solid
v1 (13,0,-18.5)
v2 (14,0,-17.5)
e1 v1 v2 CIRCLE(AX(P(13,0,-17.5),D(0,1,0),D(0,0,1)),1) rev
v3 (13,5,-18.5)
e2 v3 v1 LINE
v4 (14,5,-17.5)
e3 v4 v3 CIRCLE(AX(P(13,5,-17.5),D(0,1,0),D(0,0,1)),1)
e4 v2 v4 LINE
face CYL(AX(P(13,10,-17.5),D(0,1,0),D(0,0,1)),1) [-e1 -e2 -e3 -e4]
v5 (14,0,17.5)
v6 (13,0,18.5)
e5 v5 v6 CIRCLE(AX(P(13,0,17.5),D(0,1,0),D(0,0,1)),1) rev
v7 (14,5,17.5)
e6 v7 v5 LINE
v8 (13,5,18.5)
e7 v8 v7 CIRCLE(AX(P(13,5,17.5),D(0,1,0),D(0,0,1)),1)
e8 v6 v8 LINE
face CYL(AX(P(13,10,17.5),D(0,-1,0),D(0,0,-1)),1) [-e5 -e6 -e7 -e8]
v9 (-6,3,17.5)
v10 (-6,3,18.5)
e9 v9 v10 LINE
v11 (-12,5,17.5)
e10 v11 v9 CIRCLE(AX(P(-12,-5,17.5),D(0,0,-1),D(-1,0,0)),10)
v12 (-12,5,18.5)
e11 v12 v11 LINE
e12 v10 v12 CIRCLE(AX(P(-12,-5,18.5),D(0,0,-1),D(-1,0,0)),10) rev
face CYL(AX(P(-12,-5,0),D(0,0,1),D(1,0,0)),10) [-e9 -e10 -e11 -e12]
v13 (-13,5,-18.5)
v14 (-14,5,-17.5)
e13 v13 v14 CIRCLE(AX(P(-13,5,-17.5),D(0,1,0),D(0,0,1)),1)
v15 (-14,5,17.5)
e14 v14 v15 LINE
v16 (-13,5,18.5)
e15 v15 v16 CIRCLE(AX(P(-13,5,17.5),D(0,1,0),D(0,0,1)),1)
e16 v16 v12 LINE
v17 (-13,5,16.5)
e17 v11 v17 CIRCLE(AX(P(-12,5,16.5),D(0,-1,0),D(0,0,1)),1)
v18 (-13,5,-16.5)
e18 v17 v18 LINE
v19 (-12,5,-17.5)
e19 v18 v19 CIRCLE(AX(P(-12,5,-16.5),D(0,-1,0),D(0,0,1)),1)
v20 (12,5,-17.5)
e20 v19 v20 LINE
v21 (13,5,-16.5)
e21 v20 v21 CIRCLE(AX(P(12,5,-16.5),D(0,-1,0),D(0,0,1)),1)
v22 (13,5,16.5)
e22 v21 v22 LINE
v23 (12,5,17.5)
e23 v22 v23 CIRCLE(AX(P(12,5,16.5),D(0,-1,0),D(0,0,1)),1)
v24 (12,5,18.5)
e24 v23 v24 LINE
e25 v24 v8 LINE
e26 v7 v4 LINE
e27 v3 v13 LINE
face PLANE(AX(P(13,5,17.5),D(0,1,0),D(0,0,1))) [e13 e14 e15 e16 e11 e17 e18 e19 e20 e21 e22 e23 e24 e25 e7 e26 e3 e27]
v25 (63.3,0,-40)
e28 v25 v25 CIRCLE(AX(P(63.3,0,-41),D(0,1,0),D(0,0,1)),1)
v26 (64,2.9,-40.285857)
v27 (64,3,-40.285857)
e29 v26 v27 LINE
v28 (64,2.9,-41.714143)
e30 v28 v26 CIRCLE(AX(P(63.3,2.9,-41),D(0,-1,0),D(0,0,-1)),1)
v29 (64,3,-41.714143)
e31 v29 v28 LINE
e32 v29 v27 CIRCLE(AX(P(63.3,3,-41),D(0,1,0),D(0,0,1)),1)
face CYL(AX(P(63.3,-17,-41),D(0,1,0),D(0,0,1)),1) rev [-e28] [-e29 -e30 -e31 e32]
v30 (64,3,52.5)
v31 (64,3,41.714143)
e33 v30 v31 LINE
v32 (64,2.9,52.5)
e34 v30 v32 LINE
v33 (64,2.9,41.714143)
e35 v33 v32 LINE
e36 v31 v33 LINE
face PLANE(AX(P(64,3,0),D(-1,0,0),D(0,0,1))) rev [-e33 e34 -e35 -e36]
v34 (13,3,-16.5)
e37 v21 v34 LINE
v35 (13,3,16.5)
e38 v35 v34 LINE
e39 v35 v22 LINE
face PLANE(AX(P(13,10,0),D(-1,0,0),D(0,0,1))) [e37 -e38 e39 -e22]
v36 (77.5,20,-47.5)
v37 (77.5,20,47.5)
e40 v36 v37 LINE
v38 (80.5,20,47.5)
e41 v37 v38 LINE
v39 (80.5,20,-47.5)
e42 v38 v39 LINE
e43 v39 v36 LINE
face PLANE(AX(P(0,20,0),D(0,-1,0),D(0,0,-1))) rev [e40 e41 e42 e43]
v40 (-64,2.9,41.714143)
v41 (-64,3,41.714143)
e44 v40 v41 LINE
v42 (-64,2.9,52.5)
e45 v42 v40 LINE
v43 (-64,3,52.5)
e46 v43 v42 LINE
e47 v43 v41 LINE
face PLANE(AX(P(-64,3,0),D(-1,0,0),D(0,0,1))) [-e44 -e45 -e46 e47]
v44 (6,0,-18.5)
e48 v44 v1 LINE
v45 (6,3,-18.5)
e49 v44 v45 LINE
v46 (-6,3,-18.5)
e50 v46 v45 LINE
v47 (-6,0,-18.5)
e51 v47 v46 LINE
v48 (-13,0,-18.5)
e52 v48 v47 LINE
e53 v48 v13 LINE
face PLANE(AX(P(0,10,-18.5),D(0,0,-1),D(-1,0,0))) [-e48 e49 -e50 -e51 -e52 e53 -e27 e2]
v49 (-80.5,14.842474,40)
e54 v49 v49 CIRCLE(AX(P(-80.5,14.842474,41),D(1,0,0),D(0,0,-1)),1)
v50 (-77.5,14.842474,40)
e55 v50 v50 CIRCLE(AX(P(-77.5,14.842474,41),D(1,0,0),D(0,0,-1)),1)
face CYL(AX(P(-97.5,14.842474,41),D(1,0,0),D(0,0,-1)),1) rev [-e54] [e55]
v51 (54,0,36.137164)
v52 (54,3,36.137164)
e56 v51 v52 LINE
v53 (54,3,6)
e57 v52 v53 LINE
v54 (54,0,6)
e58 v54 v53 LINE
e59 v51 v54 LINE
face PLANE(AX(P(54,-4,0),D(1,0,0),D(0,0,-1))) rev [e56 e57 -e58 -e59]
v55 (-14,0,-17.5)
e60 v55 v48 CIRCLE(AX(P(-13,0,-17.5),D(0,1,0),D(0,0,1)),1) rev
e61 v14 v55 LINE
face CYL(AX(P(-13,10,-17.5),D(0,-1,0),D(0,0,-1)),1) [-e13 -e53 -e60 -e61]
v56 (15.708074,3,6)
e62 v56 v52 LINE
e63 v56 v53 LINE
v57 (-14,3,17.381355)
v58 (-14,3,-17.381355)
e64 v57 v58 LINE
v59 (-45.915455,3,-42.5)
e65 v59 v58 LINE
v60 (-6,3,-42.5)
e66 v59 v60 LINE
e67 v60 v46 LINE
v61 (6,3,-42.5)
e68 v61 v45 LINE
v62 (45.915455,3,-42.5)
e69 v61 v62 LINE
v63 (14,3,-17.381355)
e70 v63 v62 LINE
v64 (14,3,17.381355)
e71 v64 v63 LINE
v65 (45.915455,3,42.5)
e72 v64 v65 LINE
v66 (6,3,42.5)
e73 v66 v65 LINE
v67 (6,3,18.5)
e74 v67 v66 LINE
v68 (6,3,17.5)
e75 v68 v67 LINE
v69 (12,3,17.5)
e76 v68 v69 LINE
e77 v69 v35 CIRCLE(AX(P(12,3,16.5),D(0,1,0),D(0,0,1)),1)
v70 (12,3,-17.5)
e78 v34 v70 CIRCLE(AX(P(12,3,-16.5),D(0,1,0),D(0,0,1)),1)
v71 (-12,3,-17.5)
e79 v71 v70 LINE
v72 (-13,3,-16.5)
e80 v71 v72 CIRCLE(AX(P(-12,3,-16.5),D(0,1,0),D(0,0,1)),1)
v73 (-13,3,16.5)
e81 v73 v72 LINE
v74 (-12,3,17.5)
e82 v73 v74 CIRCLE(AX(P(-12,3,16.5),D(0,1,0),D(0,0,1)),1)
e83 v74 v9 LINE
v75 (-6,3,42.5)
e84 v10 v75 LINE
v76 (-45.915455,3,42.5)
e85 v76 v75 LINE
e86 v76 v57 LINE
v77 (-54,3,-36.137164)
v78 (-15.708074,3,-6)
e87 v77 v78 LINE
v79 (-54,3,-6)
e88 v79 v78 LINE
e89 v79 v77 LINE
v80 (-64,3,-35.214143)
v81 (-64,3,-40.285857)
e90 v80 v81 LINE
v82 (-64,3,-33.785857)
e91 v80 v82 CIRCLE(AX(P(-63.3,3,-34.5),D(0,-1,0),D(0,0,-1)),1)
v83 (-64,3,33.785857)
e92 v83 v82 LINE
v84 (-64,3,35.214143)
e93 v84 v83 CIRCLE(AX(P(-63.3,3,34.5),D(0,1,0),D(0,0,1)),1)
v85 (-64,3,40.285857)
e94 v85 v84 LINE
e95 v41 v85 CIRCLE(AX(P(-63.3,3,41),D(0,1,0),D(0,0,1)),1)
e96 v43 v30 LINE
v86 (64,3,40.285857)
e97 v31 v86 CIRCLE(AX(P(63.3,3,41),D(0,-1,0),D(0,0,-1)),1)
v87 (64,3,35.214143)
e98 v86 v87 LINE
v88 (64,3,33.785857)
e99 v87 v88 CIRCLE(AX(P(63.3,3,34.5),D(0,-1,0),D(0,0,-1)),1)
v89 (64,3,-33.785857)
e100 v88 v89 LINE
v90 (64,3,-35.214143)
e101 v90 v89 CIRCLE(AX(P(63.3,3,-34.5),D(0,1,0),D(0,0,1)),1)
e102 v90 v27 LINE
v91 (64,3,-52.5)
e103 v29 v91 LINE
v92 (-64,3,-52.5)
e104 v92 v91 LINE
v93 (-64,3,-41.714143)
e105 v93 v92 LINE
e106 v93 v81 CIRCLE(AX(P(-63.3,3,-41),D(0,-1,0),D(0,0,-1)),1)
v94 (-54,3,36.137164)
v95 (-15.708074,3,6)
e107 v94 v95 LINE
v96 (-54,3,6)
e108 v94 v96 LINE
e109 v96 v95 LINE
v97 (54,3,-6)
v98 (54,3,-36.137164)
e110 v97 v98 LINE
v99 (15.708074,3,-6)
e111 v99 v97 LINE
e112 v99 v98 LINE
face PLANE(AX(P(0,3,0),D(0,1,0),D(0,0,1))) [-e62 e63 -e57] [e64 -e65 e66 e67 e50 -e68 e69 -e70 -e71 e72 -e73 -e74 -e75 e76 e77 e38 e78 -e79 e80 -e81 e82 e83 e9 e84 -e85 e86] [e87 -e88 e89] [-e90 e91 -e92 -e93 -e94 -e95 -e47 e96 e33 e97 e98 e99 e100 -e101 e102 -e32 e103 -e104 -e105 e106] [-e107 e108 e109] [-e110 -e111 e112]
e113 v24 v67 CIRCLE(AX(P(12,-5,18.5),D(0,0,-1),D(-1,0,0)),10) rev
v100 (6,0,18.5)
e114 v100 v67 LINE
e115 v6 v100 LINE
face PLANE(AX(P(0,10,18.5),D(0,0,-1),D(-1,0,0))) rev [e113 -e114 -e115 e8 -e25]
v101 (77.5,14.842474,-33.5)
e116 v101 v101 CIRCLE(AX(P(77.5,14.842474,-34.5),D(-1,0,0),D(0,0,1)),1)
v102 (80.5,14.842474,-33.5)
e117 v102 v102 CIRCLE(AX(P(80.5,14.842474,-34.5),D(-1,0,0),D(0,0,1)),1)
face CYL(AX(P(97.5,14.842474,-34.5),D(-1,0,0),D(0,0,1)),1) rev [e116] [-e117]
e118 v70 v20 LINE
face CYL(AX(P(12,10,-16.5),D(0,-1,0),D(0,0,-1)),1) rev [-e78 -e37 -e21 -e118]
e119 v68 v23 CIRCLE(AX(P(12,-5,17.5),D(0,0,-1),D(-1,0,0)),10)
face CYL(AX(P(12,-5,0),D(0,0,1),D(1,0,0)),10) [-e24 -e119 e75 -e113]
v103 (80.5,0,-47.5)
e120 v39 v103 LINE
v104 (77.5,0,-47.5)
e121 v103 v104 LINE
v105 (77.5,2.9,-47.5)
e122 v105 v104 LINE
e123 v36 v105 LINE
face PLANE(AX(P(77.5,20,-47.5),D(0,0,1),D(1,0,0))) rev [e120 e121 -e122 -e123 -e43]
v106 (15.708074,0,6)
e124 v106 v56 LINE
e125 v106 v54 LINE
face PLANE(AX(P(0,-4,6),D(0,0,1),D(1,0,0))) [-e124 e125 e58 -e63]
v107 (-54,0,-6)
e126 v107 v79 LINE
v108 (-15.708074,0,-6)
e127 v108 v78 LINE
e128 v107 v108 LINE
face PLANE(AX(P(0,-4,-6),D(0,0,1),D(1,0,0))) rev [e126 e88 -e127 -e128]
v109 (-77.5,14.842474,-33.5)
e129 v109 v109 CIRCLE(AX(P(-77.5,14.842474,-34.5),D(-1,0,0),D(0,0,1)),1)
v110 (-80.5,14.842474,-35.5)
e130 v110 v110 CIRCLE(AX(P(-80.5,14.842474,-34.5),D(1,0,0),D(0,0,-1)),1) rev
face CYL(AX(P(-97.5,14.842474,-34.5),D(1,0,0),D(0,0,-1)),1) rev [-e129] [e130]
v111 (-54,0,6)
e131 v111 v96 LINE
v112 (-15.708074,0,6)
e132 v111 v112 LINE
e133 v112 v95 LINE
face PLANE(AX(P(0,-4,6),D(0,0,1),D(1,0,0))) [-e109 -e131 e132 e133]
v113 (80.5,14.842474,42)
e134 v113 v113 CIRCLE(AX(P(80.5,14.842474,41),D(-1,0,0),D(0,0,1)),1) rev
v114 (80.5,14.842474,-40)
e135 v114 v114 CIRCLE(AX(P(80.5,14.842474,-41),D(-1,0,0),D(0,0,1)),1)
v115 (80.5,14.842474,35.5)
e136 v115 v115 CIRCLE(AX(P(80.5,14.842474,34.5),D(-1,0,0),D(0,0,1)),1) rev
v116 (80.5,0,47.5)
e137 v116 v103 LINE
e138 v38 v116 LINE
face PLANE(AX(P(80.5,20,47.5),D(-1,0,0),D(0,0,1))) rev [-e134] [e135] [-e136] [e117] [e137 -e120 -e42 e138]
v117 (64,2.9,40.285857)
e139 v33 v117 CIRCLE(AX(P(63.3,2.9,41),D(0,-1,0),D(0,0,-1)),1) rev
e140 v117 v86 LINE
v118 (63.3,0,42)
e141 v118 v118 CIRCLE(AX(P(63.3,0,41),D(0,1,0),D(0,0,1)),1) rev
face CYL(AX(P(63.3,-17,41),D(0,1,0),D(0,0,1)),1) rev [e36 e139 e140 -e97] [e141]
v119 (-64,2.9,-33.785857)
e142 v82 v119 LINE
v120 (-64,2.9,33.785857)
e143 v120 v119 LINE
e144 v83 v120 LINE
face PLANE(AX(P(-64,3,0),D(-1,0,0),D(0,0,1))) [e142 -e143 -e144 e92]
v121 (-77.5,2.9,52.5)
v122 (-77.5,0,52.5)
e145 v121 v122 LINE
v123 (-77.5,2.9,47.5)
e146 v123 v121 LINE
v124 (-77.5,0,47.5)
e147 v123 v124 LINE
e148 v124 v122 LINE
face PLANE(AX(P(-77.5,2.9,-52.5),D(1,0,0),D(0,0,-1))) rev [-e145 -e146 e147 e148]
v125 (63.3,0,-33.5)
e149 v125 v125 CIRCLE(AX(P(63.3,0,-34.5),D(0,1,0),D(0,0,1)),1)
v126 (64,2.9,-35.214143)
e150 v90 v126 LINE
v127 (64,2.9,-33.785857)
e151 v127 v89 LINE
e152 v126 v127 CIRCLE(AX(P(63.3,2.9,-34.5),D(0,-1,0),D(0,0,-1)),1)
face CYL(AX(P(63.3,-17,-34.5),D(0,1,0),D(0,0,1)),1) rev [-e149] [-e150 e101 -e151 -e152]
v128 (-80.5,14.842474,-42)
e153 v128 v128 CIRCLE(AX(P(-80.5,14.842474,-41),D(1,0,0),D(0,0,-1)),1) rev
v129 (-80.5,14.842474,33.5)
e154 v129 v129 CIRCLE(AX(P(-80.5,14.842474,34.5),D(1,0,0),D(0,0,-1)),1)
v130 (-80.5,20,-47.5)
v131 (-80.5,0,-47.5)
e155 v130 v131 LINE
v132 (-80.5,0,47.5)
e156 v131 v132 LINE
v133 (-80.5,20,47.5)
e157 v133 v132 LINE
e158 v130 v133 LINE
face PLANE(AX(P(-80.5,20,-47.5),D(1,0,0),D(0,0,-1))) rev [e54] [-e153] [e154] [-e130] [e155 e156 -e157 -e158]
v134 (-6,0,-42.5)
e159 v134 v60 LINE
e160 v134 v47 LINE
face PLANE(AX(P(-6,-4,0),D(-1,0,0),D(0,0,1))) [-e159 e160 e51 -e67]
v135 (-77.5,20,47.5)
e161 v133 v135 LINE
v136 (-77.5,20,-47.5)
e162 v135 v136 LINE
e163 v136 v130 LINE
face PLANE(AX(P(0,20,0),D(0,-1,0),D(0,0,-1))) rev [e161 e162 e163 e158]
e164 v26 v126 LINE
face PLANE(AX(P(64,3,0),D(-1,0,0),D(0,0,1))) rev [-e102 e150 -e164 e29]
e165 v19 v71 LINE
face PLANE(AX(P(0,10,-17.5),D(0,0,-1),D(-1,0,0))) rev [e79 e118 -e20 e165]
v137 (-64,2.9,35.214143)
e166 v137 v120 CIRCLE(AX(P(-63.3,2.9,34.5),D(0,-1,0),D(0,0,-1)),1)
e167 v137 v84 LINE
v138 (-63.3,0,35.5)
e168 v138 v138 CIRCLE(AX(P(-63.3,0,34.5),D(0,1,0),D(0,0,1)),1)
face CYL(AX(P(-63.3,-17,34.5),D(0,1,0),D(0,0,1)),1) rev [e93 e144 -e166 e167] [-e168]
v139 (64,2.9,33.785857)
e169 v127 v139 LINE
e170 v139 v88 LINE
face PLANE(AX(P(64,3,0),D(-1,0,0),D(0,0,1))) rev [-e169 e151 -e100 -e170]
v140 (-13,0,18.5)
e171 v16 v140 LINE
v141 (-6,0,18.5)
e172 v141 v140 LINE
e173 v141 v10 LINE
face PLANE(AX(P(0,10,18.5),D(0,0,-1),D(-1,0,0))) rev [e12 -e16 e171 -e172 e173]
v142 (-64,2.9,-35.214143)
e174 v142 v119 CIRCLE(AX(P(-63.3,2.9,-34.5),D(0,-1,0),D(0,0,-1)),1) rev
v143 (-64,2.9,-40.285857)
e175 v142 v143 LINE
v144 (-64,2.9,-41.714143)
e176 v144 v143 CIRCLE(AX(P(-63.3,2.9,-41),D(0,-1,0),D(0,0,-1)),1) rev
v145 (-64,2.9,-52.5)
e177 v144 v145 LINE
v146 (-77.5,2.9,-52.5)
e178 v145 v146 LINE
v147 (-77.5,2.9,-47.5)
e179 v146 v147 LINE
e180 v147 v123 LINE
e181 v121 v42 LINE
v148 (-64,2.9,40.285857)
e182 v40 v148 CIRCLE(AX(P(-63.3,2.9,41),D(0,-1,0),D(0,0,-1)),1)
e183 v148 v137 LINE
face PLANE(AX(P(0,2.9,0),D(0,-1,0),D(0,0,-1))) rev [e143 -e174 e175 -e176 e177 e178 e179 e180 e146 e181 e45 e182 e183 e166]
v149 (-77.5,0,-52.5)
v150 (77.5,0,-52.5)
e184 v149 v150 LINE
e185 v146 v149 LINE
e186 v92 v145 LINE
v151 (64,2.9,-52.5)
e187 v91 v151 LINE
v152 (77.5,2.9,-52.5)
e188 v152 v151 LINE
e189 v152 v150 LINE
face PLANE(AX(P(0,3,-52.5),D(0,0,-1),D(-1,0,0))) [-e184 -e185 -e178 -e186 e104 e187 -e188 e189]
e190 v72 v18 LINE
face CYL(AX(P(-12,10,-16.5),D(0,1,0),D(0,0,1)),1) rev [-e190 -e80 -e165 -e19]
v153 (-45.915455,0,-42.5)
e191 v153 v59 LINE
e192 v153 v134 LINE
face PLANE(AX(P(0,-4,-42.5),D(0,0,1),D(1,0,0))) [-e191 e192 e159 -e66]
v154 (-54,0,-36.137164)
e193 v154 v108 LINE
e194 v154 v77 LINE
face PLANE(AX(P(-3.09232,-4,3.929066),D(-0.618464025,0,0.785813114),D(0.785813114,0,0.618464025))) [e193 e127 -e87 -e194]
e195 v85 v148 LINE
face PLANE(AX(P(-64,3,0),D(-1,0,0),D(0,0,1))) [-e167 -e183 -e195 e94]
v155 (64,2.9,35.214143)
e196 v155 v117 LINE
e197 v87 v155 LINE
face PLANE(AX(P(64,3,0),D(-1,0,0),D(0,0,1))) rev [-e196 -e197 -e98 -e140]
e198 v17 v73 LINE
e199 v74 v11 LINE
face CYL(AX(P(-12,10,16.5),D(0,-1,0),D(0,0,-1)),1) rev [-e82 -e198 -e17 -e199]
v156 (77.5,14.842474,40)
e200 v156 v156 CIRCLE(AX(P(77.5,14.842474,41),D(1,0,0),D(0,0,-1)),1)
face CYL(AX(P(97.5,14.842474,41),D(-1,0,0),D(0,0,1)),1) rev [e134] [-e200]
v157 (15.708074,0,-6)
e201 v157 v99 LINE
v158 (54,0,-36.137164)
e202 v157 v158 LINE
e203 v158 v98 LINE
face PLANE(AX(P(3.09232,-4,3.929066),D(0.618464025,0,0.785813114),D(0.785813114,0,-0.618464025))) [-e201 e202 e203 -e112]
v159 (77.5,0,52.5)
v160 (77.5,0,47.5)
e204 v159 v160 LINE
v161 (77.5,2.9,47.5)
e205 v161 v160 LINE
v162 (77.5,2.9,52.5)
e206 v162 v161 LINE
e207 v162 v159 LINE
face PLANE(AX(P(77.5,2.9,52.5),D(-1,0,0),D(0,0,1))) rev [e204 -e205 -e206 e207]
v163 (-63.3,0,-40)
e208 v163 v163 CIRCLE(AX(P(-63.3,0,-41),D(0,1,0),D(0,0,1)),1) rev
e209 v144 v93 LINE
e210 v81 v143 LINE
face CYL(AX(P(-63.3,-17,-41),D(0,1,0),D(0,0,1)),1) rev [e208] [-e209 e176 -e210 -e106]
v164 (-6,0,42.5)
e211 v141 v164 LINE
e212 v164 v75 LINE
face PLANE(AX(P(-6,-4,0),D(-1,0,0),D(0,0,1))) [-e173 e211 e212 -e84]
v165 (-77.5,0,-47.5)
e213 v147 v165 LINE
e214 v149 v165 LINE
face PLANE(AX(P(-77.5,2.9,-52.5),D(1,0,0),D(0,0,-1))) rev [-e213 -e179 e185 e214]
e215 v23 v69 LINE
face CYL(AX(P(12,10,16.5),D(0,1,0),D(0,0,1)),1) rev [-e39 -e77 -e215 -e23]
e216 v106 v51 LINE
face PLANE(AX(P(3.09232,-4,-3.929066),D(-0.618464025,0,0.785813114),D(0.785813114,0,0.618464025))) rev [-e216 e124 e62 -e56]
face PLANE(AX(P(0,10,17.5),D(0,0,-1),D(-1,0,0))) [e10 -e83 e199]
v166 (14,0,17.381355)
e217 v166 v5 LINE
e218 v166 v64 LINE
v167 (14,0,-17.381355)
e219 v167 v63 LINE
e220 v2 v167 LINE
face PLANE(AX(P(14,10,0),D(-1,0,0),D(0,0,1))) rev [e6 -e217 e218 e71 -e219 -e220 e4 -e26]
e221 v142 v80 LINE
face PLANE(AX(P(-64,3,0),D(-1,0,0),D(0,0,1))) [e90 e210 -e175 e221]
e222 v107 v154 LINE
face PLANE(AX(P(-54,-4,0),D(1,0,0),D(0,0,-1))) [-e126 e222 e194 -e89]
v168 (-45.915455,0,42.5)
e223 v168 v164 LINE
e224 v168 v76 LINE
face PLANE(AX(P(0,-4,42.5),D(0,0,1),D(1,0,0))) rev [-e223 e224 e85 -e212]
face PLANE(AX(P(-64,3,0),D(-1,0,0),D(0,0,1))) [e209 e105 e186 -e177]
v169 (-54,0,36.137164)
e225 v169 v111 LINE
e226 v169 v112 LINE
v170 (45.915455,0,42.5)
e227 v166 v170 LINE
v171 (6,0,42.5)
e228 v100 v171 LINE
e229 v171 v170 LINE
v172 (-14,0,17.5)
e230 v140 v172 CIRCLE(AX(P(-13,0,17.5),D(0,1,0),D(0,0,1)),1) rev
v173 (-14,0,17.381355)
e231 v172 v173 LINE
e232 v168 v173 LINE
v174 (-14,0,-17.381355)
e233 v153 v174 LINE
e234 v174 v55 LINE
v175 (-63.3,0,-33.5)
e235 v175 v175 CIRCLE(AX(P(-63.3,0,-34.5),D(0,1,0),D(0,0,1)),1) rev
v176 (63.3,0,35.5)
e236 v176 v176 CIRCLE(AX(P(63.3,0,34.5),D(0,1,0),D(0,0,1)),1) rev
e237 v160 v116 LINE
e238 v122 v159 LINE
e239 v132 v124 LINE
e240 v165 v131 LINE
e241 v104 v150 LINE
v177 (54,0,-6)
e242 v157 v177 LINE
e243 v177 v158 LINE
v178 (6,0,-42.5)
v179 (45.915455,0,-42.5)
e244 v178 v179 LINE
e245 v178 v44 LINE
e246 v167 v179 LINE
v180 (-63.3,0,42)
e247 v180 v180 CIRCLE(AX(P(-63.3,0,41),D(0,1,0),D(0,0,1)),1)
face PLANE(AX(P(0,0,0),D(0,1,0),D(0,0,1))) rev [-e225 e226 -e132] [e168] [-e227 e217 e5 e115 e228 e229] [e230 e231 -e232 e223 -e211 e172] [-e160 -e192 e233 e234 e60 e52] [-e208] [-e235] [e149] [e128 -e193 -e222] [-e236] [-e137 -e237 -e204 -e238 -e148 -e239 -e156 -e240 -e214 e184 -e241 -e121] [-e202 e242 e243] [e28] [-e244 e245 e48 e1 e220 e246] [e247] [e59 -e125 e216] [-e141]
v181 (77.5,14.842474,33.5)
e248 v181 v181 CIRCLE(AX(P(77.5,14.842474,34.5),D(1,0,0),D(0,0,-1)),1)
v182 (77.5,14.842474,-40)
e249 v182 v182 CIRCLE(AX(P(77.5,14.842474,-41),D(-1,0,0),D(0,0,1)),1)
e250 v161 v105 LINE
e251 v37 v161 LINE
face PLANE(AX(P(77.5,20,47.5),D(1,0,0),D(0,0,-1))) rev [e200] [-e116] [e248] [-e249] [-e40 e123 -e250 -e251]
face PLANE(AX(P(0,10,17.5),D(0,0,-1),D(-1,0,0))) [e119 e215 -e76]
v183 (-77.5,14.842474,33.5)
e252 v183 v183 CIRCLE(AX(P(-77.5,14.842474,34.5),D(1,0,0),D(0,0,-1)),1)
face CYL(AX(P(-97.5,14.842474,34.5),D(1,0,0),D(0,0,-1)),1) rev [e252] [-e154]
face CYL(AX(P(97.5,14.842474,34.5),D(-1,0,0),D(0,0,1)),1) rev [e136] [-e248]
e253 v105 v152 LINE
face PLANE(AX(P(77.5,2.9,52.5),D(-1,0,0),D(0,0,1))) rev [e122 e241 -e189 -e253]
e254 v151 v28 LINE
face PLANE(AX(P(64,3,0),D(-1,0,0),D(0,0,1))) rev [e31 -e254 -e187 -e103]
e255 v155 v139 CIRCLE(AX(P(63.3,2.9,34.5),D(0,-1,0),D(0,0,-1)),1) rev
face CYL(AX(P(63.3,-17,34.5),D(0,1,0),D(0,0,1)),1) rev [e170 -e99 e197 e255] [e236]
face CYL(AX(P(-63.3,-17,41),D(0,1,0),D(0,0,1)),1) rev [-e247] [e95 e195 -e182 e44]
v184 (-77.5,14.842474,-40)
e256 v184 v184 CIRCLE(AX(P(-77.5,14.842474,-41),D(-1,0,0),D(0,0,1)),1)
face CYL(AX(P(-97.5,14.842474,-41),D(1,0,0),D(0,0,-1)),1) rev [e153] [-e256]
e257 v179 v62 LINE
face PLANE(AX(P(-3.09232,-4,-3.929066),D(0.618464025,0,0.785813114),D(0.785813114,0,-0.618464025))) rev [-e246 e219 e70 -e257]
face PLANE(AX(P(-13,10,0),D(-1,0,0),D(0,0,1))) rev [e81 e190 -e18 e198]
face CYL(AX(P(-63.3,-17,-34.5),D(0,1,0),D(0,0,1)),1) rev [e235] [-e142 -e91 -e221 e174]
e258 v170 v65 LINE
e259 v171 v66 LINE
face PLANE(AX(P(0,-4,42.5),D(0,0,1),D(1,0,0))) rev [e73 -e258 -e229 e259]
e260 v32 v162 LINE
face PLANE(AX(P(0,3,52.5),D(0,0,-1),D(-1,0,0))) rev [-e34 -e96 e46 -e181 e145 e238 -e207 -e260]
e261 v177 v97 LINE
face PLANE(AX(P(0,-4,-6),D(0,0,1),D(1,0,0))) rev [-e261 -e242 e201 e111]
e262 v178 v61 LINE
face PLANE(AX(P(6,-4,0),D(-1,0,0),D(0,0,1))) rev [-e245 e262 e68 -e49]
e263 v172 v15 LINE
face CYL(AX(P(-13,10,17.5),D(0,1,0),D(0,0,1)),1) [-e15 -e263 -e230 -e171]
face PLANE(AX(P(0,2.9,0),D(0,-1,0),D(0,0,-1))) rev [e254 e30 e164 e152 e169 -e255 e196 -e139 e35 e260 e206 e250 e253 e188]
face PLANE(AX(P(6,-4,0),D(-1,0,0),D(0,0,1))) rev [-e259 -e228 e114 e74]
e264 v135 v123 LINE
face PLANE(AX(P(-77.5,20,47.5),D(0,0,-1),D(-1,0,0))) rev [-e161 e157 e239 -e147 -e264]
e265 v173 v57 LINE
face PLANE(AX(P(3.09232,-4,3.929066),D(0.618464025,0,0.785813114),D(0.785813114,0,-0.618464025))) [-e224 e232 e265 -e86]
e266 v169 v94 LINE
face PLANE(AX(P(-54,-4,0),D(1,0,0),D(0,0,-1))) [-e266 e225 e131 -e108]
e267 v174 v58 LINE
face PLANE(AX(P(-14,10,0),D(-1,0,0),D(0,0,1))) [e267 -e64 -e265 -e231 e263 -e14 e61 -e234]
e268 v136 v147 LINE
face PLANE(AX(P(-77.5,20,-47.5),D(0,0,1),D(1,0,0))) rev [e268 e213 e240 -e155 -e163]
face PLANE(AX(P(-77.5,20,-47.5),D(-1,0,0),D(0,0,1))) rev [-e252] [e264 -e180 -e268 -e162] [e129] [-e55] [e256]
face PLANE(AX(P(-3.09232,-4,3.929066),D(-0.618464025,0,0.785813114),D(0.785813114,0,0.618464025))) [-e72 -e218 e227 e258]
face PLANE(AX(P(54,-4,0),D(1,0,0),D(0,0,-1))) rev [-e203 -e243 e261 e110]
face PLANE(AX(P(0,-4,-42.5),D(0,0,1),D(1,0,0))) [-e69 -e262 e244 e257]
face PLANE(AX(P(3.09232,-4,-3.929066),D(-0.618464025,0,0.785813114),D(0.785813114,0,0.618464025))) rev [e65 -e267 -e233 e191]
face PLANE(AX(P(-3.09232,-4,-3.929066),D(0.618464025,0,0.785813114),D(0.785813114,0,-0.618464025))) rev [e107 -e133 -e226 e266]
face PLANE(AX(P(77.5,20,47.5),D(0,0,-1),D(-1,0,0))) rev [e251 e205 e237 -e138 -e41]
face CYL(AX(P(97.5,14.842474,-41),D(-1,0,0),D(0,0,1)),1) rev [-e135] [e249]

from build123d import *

# Parameters (mm, degrees)
SKETCH1_W                                  = 128
SKETCH1_H                                  = 105
BOSS_EXTRUDE1_DEPTH                        = 3
SKETCH2_W                                  = 13.5
SKETCH2_H                                  = 105
BOSS_EXTRUDE2_DEPTH                        = 2.9
BOSS_EXTRUDE9_DEPTH                        = 7
FILLET2_R                                  = 1
CUT_EXTRUDE1_DEPTH                         = 7
SKETCH3_W                                  = 3
SKETCH3_H                                  = 95
BOSS_EXTRUDE10_DEPTH                       = 20
SKETCH11_R                                 = 1
CUT_EXTRUDE2_DEPTH                         = 20
SKETCH13_R                                 = 1
CUT_EXTRUDE3_DEPTH                         = 20
MIRROR1_AT_THE_SECOND_PLANE_COPY_1_SKETC_R = 1
MIRROR1_AT_THE_SECOND_PLANE_COPY_1_DEPTH   = 20
CUT_EXTRUDE8_DEPTH                         = 5
FILLET3_R                                  = 10


with BuildPart() as part:
    # Sketch1 → Boss-Extrude1 (new body)
    with BuildSketch(Plane(origin=(0, 0, 0), x_dir=(1, 0, 0), z_dir=(0, 1, 0))):
        Rectangle(SKETCH1_W, SKETCH1_H)
    extrude(amount=BOSS_EXTRUDE1_DEPTH)

    # Sketch2 → Boss-Extrude2 (add)
    with BuildSketch(Plane(origin=(0, 0, 0), x_dir=(1, 0, 0), z_dir=(0, 1, 0))):
        with Locations((-70.75, 0)):
            Rectangle(SKETCH2_W, SKETCH2_H)
        with Locations((70.75, 0)):
            Rectangle(SKETCH2_W, SKETCH2_H)
    extrude(amount=BOSS_EXTRUDE2_DEPTH)

    # Sketch5 → Boss-Extrude9 (add)
    with BuildSketch(Plane(origin=(0, 3, 0), x_dir=(1, 0, 0), z_dir=(0, 1, 0))):
        Polygon((-6, -18.5), (-6, -17.5), (-13, -17.5), (-13, 17.5), (13, 17.5), (13, -17.5), (6, -17.5), (6, -18.5), (14, -18.5), (14, 18.5), (-14, 18.5), (-14, -18.5), align=None)
    extrude(amount=BOSS_EXTRUDE9_DEPTH)

    # Fillet2
    fillet2_edges = [part.edges().sort_by_distance(p)[0] for p in [
        (13, 6.5, 17.5),
        (14, 6.5, 18.5),
        (14, 6.5, -18.5),
        (-14, 6.5, -18.5),
        (-14, 6.5, 18.5),
        (-13, 6.5, 17.5),
        (-13, 6.5, -17.5),
        (13, 6.5, -17.5),
    ]]
    fillet(fillet2_edges, radius=FILLET2_R)

    # Sketch10 → Cut-Extrude1 (cut)
    with BuildSketch(Plane(origin=(0, 3, 0), x_dir=(1, 0, 0), z_dir=(0, 1, 0))):
        with BuildLine():
            Line((-14, -17.381354556), (-45.915455387, -42.5))
            Line((-45.915455387, -42.5), (-6, -42.5))
            Line((-6, -42.5), (-6, -18.5))
            Line((-6, -18.5), (-13, -18.5))
            ThreePointArc((-13, -18.5), (-13.707106781, -18.207106781), (-14, -17.5))
            Line((-14, -17.5), (-14, -17.381354556))
        make_face()
        Polygon((-54, -6), (-54, -36.137163962), (-15.708074024, -6), align=None)
        with BuildLine():
            Line((6, -18.5), (6, -42.5))
            Line((6, -42.5), (45.915455387, -42.5))
            Line((45.915455387, -42.5), (14, -17.381354556))
            Line((14, -17.381354556), (14, -17.5))
            ThreePointArc((14, -17.5), (13.707106781, -18.207106781), (13, -18.5))
            Line((13, -18.5), (6, -18.5))
        make_face()
        Polygon((-54, 36.137163962), (-54, 6), (-15.708074024, 6), align=None)
        Polygon((15.708074024, -6), (54, -36.137163962), (54, -6), align=None)
        with BuildLine():
            Line((-6, 42.5), (-45.915455387, 42.5))
            Line((-45.915455387, 42.5), (-14, 17.381354556))
            Line((-14, 17.381354556), (-14, 17.5))
            ThreePointArc((-14, 17.5), (-13.707106781, 18.207106781), (-13, 18.5))
            Line((-13, 18.5), (-6, 18.5))
            Line((-6, 18.5), (-6, 42.5))
        make_face()
        Polygon((15.708074024, 6), (54, 6), (54, 36.137163962), align=None)
        with BuildLine():
            Line((45.915455387, 42.5), (6, 42.5))
            Line((6, 42.5), (6, 18.5))
            Line((6, 18.5), (13, 18.5))
            ThreePointArc((13, 18.5), (13.707106781, 18.207106781), (14, 17.5))
            Line((14, 17.5), (14, 17.381354556))
            Line((14, 17.381354556), (45.915455387, 42.5))
        make_face()
    extrude(amount=-CUT_EXTRUDE1_DEPTH, mode=Mode.SUBTRACT)

    # Sketch3 → Boss-Extrude10 (add)
    with BuildSketch(Plane(origin=(0, 0, 0), x_dir=(1, 0, 0), z_dir=(0, 1, 0))):
        with Locations((-79, 0)):
            Rectangle(SKETCH3_W, SKETCH3_H)
        with Locations((79, 0)):
            Rectangle(SKETCH3_W, SKETCH3_H)
    extrude(amount=BOSS_EXTRUDE10_DEPTH)

    # Sketch11 → Cut-Extrude2 (cut)
    with BuildSketch(Plane(origin=(0, 3, 0), x_dir=(1, 0, 0), z_dir=(0, 1, 0))):
        with Locations(Location((-63.3, -41, 0), (0, 0, 270))):
            Circle(SKETCH11_R)
        with Locations(Location((-63.3, -34.5, 0), (0, 0, 270))):
            Circle(SKETCH11_R)
        with Locations(Location((-63.3, 34.5, 0), (0, 0, 270))):
            Circle(SKETCH11_R)
        with Locations(Location((-63.3, 41, 0), (0, 0, 270))):
            Circle(SKETCH11_R)
        with Locations(Location((63.3, 41, 0), (0, 0, 270))):
            Circle(SKETCH11_R)
        with Locations(Location((63.3, 34.5, 0), (0, 0, 270))):
            Circle(SKETCH11_R)
        with Locations(Location((63.3, -34.5, 0), (0, 0, 270))):
            Circle(SKETCH11_R)
        with Locations(Location((63.3, -41, 0), (0, 0, 270))):
            Circle(SKETCH11_R)
    extrude(amount=-CUT_EXTRUDE2_DEPTH, mode=Mode.SUBTRACT)

    # Sketch13 → Cut-Extrude3 (cut)
    with BuildSketch(Plane(origin=(-77.5, 0, 0), x_dir=(0, 0, -1), z_dir=(1, 0, 0))):
        with Locations((-41, 14.842473729)):
            Circle(SKETCH13_R)
        with Locations((-34.5, 14.842473729)):
            Circle(SKETCH13_R)
    cut_extrude3 = extrude(amount=-CUT_EXTRUDE3_DEPTH, mode=Mode.SUBTRACT)

    # Mirror1: Cut-Extrude3 across plane
    add(cut_extrude3.mirror(Plane.XY), mode=Mode.SUBTRACT)

    # Mirror1 at the second plane: Cut-Extrude3 across plane
    add(cut_extrude3.mirror(Plane(origin=(0, 0, 0), x_dir=(0, 0, 1), z_dir=(1, 0, 0))), mode=Mode.SUBTRACT)

    # Mirror1 at the second plane copy 1 sketc → Mirror1 at the second plane copy 1 (cut)
    with BuildSketch(Plane.ZY.offset(-77.5)):
        with Locations((-41, 14.842473729)):
            Circle(MIRROR1_AT_THE_SECOND_PLANE_COPY_1_SKETC_R)
        with Locations((-34.5, 14.842473729)):
            Circle(MIRROR1_AT_THE_SECOND_PLANE_COPY_1_SKETC_R)
    extrude(amount=-MIRROR1_AT_THE_SECOND_PLANE_COPY_1_DEPTH, mode=Mode.SUBTRACT)

    # Sketch22 → Cut-Extrude8 (cut)
    with BuildSketch(Plane(origin=(0, 10, 0), x_dir=(1, 0, 0), z_dir=(0, 1, 0))):
        with BuildLine():
            Line((14, -17.5), (14, 17.5))
            ThreePointArc((14, 17.5), (13.707106781, 18.207106781), (13, 18.5))
            Line((13, 18.5), (-13, 18.5))
            ThreePointArc((-13, 18.5), (-13.707106781, 18.207106781), (-14, 17.5))
            Line((-14, 17.5), (-14, -17.5))
            ThreePointArc((-14, -17.5), (-13.707106781, -18.207106781), (-13, -18.5))
            Line((-13, -18.5), (-6, -18.5))
            Line((-6, -18.5), (-6, -17.5))
            Line((-6, -17.5), (-12, -17.5))
            ThreePointArc((-12, -17.5), (-12.707106781, -17.207106781), (-13, -16.5))
            Line((-13, -16.5), (-13, 16.5))
            ThreePointArc((-13, 16.5), (-12.707106781, 17.207106781), (-12, 17.5))
            Line((-12, 17.5), (12, 17.5))
            ThreePointArc((12, 17.5), (12.707106781, 17.207106781), (13, 16.5))
            Line((13, 16.5), (13, -16.5))
            ThreePointArc((13, -16.5), (12.707106781, -17.207106781), (12, -17.5))
            Line((12, -17.5), (6, -17.5))
            Line((6, -17.5), (6, -18.5))
            Line((6, -18.5), (13, -18.5))
            ThreePointArc((13, -18.5), (13.707106781, -18.207106781), (14, -17.5))
        make_face()
    extrude(amount=-CUT_EXTRUDE8_DEPTH, mode=Mode.SUBTRACT)

    # Fillet3
    # the kernel refuses this fillet: 10 mm, written as the material it takes off along each edge
    with BuildSketch(Plane(origin=(6, 5, 2.5), x_dir=(0, -1, 0), z_dir=(0, 0, 1)), Plane(origin=(-6, 5, 33.5), x_dir=(0, -1, 0), z_dir=(0, 0, -1))) as fillet3_piece_1:
        with BuildLine():
            CenterArc((10, 6), FILLET3_R, 180, 36.869897646)
            Line((0, 6), (-0.2, 6))
            Line((-0.2, 6), (-0.2, 0))
            Line((-0.2, 0), (0, -0.2))
            ThreePointArc((0, -0.2), (1, -0.2), (1.84, -0.12))
            Line((1.84, -0.12), (2, 0))
        make_face()
    extrude(amount=31, mode=Mode.SUBTRACT)


solid = part.part
